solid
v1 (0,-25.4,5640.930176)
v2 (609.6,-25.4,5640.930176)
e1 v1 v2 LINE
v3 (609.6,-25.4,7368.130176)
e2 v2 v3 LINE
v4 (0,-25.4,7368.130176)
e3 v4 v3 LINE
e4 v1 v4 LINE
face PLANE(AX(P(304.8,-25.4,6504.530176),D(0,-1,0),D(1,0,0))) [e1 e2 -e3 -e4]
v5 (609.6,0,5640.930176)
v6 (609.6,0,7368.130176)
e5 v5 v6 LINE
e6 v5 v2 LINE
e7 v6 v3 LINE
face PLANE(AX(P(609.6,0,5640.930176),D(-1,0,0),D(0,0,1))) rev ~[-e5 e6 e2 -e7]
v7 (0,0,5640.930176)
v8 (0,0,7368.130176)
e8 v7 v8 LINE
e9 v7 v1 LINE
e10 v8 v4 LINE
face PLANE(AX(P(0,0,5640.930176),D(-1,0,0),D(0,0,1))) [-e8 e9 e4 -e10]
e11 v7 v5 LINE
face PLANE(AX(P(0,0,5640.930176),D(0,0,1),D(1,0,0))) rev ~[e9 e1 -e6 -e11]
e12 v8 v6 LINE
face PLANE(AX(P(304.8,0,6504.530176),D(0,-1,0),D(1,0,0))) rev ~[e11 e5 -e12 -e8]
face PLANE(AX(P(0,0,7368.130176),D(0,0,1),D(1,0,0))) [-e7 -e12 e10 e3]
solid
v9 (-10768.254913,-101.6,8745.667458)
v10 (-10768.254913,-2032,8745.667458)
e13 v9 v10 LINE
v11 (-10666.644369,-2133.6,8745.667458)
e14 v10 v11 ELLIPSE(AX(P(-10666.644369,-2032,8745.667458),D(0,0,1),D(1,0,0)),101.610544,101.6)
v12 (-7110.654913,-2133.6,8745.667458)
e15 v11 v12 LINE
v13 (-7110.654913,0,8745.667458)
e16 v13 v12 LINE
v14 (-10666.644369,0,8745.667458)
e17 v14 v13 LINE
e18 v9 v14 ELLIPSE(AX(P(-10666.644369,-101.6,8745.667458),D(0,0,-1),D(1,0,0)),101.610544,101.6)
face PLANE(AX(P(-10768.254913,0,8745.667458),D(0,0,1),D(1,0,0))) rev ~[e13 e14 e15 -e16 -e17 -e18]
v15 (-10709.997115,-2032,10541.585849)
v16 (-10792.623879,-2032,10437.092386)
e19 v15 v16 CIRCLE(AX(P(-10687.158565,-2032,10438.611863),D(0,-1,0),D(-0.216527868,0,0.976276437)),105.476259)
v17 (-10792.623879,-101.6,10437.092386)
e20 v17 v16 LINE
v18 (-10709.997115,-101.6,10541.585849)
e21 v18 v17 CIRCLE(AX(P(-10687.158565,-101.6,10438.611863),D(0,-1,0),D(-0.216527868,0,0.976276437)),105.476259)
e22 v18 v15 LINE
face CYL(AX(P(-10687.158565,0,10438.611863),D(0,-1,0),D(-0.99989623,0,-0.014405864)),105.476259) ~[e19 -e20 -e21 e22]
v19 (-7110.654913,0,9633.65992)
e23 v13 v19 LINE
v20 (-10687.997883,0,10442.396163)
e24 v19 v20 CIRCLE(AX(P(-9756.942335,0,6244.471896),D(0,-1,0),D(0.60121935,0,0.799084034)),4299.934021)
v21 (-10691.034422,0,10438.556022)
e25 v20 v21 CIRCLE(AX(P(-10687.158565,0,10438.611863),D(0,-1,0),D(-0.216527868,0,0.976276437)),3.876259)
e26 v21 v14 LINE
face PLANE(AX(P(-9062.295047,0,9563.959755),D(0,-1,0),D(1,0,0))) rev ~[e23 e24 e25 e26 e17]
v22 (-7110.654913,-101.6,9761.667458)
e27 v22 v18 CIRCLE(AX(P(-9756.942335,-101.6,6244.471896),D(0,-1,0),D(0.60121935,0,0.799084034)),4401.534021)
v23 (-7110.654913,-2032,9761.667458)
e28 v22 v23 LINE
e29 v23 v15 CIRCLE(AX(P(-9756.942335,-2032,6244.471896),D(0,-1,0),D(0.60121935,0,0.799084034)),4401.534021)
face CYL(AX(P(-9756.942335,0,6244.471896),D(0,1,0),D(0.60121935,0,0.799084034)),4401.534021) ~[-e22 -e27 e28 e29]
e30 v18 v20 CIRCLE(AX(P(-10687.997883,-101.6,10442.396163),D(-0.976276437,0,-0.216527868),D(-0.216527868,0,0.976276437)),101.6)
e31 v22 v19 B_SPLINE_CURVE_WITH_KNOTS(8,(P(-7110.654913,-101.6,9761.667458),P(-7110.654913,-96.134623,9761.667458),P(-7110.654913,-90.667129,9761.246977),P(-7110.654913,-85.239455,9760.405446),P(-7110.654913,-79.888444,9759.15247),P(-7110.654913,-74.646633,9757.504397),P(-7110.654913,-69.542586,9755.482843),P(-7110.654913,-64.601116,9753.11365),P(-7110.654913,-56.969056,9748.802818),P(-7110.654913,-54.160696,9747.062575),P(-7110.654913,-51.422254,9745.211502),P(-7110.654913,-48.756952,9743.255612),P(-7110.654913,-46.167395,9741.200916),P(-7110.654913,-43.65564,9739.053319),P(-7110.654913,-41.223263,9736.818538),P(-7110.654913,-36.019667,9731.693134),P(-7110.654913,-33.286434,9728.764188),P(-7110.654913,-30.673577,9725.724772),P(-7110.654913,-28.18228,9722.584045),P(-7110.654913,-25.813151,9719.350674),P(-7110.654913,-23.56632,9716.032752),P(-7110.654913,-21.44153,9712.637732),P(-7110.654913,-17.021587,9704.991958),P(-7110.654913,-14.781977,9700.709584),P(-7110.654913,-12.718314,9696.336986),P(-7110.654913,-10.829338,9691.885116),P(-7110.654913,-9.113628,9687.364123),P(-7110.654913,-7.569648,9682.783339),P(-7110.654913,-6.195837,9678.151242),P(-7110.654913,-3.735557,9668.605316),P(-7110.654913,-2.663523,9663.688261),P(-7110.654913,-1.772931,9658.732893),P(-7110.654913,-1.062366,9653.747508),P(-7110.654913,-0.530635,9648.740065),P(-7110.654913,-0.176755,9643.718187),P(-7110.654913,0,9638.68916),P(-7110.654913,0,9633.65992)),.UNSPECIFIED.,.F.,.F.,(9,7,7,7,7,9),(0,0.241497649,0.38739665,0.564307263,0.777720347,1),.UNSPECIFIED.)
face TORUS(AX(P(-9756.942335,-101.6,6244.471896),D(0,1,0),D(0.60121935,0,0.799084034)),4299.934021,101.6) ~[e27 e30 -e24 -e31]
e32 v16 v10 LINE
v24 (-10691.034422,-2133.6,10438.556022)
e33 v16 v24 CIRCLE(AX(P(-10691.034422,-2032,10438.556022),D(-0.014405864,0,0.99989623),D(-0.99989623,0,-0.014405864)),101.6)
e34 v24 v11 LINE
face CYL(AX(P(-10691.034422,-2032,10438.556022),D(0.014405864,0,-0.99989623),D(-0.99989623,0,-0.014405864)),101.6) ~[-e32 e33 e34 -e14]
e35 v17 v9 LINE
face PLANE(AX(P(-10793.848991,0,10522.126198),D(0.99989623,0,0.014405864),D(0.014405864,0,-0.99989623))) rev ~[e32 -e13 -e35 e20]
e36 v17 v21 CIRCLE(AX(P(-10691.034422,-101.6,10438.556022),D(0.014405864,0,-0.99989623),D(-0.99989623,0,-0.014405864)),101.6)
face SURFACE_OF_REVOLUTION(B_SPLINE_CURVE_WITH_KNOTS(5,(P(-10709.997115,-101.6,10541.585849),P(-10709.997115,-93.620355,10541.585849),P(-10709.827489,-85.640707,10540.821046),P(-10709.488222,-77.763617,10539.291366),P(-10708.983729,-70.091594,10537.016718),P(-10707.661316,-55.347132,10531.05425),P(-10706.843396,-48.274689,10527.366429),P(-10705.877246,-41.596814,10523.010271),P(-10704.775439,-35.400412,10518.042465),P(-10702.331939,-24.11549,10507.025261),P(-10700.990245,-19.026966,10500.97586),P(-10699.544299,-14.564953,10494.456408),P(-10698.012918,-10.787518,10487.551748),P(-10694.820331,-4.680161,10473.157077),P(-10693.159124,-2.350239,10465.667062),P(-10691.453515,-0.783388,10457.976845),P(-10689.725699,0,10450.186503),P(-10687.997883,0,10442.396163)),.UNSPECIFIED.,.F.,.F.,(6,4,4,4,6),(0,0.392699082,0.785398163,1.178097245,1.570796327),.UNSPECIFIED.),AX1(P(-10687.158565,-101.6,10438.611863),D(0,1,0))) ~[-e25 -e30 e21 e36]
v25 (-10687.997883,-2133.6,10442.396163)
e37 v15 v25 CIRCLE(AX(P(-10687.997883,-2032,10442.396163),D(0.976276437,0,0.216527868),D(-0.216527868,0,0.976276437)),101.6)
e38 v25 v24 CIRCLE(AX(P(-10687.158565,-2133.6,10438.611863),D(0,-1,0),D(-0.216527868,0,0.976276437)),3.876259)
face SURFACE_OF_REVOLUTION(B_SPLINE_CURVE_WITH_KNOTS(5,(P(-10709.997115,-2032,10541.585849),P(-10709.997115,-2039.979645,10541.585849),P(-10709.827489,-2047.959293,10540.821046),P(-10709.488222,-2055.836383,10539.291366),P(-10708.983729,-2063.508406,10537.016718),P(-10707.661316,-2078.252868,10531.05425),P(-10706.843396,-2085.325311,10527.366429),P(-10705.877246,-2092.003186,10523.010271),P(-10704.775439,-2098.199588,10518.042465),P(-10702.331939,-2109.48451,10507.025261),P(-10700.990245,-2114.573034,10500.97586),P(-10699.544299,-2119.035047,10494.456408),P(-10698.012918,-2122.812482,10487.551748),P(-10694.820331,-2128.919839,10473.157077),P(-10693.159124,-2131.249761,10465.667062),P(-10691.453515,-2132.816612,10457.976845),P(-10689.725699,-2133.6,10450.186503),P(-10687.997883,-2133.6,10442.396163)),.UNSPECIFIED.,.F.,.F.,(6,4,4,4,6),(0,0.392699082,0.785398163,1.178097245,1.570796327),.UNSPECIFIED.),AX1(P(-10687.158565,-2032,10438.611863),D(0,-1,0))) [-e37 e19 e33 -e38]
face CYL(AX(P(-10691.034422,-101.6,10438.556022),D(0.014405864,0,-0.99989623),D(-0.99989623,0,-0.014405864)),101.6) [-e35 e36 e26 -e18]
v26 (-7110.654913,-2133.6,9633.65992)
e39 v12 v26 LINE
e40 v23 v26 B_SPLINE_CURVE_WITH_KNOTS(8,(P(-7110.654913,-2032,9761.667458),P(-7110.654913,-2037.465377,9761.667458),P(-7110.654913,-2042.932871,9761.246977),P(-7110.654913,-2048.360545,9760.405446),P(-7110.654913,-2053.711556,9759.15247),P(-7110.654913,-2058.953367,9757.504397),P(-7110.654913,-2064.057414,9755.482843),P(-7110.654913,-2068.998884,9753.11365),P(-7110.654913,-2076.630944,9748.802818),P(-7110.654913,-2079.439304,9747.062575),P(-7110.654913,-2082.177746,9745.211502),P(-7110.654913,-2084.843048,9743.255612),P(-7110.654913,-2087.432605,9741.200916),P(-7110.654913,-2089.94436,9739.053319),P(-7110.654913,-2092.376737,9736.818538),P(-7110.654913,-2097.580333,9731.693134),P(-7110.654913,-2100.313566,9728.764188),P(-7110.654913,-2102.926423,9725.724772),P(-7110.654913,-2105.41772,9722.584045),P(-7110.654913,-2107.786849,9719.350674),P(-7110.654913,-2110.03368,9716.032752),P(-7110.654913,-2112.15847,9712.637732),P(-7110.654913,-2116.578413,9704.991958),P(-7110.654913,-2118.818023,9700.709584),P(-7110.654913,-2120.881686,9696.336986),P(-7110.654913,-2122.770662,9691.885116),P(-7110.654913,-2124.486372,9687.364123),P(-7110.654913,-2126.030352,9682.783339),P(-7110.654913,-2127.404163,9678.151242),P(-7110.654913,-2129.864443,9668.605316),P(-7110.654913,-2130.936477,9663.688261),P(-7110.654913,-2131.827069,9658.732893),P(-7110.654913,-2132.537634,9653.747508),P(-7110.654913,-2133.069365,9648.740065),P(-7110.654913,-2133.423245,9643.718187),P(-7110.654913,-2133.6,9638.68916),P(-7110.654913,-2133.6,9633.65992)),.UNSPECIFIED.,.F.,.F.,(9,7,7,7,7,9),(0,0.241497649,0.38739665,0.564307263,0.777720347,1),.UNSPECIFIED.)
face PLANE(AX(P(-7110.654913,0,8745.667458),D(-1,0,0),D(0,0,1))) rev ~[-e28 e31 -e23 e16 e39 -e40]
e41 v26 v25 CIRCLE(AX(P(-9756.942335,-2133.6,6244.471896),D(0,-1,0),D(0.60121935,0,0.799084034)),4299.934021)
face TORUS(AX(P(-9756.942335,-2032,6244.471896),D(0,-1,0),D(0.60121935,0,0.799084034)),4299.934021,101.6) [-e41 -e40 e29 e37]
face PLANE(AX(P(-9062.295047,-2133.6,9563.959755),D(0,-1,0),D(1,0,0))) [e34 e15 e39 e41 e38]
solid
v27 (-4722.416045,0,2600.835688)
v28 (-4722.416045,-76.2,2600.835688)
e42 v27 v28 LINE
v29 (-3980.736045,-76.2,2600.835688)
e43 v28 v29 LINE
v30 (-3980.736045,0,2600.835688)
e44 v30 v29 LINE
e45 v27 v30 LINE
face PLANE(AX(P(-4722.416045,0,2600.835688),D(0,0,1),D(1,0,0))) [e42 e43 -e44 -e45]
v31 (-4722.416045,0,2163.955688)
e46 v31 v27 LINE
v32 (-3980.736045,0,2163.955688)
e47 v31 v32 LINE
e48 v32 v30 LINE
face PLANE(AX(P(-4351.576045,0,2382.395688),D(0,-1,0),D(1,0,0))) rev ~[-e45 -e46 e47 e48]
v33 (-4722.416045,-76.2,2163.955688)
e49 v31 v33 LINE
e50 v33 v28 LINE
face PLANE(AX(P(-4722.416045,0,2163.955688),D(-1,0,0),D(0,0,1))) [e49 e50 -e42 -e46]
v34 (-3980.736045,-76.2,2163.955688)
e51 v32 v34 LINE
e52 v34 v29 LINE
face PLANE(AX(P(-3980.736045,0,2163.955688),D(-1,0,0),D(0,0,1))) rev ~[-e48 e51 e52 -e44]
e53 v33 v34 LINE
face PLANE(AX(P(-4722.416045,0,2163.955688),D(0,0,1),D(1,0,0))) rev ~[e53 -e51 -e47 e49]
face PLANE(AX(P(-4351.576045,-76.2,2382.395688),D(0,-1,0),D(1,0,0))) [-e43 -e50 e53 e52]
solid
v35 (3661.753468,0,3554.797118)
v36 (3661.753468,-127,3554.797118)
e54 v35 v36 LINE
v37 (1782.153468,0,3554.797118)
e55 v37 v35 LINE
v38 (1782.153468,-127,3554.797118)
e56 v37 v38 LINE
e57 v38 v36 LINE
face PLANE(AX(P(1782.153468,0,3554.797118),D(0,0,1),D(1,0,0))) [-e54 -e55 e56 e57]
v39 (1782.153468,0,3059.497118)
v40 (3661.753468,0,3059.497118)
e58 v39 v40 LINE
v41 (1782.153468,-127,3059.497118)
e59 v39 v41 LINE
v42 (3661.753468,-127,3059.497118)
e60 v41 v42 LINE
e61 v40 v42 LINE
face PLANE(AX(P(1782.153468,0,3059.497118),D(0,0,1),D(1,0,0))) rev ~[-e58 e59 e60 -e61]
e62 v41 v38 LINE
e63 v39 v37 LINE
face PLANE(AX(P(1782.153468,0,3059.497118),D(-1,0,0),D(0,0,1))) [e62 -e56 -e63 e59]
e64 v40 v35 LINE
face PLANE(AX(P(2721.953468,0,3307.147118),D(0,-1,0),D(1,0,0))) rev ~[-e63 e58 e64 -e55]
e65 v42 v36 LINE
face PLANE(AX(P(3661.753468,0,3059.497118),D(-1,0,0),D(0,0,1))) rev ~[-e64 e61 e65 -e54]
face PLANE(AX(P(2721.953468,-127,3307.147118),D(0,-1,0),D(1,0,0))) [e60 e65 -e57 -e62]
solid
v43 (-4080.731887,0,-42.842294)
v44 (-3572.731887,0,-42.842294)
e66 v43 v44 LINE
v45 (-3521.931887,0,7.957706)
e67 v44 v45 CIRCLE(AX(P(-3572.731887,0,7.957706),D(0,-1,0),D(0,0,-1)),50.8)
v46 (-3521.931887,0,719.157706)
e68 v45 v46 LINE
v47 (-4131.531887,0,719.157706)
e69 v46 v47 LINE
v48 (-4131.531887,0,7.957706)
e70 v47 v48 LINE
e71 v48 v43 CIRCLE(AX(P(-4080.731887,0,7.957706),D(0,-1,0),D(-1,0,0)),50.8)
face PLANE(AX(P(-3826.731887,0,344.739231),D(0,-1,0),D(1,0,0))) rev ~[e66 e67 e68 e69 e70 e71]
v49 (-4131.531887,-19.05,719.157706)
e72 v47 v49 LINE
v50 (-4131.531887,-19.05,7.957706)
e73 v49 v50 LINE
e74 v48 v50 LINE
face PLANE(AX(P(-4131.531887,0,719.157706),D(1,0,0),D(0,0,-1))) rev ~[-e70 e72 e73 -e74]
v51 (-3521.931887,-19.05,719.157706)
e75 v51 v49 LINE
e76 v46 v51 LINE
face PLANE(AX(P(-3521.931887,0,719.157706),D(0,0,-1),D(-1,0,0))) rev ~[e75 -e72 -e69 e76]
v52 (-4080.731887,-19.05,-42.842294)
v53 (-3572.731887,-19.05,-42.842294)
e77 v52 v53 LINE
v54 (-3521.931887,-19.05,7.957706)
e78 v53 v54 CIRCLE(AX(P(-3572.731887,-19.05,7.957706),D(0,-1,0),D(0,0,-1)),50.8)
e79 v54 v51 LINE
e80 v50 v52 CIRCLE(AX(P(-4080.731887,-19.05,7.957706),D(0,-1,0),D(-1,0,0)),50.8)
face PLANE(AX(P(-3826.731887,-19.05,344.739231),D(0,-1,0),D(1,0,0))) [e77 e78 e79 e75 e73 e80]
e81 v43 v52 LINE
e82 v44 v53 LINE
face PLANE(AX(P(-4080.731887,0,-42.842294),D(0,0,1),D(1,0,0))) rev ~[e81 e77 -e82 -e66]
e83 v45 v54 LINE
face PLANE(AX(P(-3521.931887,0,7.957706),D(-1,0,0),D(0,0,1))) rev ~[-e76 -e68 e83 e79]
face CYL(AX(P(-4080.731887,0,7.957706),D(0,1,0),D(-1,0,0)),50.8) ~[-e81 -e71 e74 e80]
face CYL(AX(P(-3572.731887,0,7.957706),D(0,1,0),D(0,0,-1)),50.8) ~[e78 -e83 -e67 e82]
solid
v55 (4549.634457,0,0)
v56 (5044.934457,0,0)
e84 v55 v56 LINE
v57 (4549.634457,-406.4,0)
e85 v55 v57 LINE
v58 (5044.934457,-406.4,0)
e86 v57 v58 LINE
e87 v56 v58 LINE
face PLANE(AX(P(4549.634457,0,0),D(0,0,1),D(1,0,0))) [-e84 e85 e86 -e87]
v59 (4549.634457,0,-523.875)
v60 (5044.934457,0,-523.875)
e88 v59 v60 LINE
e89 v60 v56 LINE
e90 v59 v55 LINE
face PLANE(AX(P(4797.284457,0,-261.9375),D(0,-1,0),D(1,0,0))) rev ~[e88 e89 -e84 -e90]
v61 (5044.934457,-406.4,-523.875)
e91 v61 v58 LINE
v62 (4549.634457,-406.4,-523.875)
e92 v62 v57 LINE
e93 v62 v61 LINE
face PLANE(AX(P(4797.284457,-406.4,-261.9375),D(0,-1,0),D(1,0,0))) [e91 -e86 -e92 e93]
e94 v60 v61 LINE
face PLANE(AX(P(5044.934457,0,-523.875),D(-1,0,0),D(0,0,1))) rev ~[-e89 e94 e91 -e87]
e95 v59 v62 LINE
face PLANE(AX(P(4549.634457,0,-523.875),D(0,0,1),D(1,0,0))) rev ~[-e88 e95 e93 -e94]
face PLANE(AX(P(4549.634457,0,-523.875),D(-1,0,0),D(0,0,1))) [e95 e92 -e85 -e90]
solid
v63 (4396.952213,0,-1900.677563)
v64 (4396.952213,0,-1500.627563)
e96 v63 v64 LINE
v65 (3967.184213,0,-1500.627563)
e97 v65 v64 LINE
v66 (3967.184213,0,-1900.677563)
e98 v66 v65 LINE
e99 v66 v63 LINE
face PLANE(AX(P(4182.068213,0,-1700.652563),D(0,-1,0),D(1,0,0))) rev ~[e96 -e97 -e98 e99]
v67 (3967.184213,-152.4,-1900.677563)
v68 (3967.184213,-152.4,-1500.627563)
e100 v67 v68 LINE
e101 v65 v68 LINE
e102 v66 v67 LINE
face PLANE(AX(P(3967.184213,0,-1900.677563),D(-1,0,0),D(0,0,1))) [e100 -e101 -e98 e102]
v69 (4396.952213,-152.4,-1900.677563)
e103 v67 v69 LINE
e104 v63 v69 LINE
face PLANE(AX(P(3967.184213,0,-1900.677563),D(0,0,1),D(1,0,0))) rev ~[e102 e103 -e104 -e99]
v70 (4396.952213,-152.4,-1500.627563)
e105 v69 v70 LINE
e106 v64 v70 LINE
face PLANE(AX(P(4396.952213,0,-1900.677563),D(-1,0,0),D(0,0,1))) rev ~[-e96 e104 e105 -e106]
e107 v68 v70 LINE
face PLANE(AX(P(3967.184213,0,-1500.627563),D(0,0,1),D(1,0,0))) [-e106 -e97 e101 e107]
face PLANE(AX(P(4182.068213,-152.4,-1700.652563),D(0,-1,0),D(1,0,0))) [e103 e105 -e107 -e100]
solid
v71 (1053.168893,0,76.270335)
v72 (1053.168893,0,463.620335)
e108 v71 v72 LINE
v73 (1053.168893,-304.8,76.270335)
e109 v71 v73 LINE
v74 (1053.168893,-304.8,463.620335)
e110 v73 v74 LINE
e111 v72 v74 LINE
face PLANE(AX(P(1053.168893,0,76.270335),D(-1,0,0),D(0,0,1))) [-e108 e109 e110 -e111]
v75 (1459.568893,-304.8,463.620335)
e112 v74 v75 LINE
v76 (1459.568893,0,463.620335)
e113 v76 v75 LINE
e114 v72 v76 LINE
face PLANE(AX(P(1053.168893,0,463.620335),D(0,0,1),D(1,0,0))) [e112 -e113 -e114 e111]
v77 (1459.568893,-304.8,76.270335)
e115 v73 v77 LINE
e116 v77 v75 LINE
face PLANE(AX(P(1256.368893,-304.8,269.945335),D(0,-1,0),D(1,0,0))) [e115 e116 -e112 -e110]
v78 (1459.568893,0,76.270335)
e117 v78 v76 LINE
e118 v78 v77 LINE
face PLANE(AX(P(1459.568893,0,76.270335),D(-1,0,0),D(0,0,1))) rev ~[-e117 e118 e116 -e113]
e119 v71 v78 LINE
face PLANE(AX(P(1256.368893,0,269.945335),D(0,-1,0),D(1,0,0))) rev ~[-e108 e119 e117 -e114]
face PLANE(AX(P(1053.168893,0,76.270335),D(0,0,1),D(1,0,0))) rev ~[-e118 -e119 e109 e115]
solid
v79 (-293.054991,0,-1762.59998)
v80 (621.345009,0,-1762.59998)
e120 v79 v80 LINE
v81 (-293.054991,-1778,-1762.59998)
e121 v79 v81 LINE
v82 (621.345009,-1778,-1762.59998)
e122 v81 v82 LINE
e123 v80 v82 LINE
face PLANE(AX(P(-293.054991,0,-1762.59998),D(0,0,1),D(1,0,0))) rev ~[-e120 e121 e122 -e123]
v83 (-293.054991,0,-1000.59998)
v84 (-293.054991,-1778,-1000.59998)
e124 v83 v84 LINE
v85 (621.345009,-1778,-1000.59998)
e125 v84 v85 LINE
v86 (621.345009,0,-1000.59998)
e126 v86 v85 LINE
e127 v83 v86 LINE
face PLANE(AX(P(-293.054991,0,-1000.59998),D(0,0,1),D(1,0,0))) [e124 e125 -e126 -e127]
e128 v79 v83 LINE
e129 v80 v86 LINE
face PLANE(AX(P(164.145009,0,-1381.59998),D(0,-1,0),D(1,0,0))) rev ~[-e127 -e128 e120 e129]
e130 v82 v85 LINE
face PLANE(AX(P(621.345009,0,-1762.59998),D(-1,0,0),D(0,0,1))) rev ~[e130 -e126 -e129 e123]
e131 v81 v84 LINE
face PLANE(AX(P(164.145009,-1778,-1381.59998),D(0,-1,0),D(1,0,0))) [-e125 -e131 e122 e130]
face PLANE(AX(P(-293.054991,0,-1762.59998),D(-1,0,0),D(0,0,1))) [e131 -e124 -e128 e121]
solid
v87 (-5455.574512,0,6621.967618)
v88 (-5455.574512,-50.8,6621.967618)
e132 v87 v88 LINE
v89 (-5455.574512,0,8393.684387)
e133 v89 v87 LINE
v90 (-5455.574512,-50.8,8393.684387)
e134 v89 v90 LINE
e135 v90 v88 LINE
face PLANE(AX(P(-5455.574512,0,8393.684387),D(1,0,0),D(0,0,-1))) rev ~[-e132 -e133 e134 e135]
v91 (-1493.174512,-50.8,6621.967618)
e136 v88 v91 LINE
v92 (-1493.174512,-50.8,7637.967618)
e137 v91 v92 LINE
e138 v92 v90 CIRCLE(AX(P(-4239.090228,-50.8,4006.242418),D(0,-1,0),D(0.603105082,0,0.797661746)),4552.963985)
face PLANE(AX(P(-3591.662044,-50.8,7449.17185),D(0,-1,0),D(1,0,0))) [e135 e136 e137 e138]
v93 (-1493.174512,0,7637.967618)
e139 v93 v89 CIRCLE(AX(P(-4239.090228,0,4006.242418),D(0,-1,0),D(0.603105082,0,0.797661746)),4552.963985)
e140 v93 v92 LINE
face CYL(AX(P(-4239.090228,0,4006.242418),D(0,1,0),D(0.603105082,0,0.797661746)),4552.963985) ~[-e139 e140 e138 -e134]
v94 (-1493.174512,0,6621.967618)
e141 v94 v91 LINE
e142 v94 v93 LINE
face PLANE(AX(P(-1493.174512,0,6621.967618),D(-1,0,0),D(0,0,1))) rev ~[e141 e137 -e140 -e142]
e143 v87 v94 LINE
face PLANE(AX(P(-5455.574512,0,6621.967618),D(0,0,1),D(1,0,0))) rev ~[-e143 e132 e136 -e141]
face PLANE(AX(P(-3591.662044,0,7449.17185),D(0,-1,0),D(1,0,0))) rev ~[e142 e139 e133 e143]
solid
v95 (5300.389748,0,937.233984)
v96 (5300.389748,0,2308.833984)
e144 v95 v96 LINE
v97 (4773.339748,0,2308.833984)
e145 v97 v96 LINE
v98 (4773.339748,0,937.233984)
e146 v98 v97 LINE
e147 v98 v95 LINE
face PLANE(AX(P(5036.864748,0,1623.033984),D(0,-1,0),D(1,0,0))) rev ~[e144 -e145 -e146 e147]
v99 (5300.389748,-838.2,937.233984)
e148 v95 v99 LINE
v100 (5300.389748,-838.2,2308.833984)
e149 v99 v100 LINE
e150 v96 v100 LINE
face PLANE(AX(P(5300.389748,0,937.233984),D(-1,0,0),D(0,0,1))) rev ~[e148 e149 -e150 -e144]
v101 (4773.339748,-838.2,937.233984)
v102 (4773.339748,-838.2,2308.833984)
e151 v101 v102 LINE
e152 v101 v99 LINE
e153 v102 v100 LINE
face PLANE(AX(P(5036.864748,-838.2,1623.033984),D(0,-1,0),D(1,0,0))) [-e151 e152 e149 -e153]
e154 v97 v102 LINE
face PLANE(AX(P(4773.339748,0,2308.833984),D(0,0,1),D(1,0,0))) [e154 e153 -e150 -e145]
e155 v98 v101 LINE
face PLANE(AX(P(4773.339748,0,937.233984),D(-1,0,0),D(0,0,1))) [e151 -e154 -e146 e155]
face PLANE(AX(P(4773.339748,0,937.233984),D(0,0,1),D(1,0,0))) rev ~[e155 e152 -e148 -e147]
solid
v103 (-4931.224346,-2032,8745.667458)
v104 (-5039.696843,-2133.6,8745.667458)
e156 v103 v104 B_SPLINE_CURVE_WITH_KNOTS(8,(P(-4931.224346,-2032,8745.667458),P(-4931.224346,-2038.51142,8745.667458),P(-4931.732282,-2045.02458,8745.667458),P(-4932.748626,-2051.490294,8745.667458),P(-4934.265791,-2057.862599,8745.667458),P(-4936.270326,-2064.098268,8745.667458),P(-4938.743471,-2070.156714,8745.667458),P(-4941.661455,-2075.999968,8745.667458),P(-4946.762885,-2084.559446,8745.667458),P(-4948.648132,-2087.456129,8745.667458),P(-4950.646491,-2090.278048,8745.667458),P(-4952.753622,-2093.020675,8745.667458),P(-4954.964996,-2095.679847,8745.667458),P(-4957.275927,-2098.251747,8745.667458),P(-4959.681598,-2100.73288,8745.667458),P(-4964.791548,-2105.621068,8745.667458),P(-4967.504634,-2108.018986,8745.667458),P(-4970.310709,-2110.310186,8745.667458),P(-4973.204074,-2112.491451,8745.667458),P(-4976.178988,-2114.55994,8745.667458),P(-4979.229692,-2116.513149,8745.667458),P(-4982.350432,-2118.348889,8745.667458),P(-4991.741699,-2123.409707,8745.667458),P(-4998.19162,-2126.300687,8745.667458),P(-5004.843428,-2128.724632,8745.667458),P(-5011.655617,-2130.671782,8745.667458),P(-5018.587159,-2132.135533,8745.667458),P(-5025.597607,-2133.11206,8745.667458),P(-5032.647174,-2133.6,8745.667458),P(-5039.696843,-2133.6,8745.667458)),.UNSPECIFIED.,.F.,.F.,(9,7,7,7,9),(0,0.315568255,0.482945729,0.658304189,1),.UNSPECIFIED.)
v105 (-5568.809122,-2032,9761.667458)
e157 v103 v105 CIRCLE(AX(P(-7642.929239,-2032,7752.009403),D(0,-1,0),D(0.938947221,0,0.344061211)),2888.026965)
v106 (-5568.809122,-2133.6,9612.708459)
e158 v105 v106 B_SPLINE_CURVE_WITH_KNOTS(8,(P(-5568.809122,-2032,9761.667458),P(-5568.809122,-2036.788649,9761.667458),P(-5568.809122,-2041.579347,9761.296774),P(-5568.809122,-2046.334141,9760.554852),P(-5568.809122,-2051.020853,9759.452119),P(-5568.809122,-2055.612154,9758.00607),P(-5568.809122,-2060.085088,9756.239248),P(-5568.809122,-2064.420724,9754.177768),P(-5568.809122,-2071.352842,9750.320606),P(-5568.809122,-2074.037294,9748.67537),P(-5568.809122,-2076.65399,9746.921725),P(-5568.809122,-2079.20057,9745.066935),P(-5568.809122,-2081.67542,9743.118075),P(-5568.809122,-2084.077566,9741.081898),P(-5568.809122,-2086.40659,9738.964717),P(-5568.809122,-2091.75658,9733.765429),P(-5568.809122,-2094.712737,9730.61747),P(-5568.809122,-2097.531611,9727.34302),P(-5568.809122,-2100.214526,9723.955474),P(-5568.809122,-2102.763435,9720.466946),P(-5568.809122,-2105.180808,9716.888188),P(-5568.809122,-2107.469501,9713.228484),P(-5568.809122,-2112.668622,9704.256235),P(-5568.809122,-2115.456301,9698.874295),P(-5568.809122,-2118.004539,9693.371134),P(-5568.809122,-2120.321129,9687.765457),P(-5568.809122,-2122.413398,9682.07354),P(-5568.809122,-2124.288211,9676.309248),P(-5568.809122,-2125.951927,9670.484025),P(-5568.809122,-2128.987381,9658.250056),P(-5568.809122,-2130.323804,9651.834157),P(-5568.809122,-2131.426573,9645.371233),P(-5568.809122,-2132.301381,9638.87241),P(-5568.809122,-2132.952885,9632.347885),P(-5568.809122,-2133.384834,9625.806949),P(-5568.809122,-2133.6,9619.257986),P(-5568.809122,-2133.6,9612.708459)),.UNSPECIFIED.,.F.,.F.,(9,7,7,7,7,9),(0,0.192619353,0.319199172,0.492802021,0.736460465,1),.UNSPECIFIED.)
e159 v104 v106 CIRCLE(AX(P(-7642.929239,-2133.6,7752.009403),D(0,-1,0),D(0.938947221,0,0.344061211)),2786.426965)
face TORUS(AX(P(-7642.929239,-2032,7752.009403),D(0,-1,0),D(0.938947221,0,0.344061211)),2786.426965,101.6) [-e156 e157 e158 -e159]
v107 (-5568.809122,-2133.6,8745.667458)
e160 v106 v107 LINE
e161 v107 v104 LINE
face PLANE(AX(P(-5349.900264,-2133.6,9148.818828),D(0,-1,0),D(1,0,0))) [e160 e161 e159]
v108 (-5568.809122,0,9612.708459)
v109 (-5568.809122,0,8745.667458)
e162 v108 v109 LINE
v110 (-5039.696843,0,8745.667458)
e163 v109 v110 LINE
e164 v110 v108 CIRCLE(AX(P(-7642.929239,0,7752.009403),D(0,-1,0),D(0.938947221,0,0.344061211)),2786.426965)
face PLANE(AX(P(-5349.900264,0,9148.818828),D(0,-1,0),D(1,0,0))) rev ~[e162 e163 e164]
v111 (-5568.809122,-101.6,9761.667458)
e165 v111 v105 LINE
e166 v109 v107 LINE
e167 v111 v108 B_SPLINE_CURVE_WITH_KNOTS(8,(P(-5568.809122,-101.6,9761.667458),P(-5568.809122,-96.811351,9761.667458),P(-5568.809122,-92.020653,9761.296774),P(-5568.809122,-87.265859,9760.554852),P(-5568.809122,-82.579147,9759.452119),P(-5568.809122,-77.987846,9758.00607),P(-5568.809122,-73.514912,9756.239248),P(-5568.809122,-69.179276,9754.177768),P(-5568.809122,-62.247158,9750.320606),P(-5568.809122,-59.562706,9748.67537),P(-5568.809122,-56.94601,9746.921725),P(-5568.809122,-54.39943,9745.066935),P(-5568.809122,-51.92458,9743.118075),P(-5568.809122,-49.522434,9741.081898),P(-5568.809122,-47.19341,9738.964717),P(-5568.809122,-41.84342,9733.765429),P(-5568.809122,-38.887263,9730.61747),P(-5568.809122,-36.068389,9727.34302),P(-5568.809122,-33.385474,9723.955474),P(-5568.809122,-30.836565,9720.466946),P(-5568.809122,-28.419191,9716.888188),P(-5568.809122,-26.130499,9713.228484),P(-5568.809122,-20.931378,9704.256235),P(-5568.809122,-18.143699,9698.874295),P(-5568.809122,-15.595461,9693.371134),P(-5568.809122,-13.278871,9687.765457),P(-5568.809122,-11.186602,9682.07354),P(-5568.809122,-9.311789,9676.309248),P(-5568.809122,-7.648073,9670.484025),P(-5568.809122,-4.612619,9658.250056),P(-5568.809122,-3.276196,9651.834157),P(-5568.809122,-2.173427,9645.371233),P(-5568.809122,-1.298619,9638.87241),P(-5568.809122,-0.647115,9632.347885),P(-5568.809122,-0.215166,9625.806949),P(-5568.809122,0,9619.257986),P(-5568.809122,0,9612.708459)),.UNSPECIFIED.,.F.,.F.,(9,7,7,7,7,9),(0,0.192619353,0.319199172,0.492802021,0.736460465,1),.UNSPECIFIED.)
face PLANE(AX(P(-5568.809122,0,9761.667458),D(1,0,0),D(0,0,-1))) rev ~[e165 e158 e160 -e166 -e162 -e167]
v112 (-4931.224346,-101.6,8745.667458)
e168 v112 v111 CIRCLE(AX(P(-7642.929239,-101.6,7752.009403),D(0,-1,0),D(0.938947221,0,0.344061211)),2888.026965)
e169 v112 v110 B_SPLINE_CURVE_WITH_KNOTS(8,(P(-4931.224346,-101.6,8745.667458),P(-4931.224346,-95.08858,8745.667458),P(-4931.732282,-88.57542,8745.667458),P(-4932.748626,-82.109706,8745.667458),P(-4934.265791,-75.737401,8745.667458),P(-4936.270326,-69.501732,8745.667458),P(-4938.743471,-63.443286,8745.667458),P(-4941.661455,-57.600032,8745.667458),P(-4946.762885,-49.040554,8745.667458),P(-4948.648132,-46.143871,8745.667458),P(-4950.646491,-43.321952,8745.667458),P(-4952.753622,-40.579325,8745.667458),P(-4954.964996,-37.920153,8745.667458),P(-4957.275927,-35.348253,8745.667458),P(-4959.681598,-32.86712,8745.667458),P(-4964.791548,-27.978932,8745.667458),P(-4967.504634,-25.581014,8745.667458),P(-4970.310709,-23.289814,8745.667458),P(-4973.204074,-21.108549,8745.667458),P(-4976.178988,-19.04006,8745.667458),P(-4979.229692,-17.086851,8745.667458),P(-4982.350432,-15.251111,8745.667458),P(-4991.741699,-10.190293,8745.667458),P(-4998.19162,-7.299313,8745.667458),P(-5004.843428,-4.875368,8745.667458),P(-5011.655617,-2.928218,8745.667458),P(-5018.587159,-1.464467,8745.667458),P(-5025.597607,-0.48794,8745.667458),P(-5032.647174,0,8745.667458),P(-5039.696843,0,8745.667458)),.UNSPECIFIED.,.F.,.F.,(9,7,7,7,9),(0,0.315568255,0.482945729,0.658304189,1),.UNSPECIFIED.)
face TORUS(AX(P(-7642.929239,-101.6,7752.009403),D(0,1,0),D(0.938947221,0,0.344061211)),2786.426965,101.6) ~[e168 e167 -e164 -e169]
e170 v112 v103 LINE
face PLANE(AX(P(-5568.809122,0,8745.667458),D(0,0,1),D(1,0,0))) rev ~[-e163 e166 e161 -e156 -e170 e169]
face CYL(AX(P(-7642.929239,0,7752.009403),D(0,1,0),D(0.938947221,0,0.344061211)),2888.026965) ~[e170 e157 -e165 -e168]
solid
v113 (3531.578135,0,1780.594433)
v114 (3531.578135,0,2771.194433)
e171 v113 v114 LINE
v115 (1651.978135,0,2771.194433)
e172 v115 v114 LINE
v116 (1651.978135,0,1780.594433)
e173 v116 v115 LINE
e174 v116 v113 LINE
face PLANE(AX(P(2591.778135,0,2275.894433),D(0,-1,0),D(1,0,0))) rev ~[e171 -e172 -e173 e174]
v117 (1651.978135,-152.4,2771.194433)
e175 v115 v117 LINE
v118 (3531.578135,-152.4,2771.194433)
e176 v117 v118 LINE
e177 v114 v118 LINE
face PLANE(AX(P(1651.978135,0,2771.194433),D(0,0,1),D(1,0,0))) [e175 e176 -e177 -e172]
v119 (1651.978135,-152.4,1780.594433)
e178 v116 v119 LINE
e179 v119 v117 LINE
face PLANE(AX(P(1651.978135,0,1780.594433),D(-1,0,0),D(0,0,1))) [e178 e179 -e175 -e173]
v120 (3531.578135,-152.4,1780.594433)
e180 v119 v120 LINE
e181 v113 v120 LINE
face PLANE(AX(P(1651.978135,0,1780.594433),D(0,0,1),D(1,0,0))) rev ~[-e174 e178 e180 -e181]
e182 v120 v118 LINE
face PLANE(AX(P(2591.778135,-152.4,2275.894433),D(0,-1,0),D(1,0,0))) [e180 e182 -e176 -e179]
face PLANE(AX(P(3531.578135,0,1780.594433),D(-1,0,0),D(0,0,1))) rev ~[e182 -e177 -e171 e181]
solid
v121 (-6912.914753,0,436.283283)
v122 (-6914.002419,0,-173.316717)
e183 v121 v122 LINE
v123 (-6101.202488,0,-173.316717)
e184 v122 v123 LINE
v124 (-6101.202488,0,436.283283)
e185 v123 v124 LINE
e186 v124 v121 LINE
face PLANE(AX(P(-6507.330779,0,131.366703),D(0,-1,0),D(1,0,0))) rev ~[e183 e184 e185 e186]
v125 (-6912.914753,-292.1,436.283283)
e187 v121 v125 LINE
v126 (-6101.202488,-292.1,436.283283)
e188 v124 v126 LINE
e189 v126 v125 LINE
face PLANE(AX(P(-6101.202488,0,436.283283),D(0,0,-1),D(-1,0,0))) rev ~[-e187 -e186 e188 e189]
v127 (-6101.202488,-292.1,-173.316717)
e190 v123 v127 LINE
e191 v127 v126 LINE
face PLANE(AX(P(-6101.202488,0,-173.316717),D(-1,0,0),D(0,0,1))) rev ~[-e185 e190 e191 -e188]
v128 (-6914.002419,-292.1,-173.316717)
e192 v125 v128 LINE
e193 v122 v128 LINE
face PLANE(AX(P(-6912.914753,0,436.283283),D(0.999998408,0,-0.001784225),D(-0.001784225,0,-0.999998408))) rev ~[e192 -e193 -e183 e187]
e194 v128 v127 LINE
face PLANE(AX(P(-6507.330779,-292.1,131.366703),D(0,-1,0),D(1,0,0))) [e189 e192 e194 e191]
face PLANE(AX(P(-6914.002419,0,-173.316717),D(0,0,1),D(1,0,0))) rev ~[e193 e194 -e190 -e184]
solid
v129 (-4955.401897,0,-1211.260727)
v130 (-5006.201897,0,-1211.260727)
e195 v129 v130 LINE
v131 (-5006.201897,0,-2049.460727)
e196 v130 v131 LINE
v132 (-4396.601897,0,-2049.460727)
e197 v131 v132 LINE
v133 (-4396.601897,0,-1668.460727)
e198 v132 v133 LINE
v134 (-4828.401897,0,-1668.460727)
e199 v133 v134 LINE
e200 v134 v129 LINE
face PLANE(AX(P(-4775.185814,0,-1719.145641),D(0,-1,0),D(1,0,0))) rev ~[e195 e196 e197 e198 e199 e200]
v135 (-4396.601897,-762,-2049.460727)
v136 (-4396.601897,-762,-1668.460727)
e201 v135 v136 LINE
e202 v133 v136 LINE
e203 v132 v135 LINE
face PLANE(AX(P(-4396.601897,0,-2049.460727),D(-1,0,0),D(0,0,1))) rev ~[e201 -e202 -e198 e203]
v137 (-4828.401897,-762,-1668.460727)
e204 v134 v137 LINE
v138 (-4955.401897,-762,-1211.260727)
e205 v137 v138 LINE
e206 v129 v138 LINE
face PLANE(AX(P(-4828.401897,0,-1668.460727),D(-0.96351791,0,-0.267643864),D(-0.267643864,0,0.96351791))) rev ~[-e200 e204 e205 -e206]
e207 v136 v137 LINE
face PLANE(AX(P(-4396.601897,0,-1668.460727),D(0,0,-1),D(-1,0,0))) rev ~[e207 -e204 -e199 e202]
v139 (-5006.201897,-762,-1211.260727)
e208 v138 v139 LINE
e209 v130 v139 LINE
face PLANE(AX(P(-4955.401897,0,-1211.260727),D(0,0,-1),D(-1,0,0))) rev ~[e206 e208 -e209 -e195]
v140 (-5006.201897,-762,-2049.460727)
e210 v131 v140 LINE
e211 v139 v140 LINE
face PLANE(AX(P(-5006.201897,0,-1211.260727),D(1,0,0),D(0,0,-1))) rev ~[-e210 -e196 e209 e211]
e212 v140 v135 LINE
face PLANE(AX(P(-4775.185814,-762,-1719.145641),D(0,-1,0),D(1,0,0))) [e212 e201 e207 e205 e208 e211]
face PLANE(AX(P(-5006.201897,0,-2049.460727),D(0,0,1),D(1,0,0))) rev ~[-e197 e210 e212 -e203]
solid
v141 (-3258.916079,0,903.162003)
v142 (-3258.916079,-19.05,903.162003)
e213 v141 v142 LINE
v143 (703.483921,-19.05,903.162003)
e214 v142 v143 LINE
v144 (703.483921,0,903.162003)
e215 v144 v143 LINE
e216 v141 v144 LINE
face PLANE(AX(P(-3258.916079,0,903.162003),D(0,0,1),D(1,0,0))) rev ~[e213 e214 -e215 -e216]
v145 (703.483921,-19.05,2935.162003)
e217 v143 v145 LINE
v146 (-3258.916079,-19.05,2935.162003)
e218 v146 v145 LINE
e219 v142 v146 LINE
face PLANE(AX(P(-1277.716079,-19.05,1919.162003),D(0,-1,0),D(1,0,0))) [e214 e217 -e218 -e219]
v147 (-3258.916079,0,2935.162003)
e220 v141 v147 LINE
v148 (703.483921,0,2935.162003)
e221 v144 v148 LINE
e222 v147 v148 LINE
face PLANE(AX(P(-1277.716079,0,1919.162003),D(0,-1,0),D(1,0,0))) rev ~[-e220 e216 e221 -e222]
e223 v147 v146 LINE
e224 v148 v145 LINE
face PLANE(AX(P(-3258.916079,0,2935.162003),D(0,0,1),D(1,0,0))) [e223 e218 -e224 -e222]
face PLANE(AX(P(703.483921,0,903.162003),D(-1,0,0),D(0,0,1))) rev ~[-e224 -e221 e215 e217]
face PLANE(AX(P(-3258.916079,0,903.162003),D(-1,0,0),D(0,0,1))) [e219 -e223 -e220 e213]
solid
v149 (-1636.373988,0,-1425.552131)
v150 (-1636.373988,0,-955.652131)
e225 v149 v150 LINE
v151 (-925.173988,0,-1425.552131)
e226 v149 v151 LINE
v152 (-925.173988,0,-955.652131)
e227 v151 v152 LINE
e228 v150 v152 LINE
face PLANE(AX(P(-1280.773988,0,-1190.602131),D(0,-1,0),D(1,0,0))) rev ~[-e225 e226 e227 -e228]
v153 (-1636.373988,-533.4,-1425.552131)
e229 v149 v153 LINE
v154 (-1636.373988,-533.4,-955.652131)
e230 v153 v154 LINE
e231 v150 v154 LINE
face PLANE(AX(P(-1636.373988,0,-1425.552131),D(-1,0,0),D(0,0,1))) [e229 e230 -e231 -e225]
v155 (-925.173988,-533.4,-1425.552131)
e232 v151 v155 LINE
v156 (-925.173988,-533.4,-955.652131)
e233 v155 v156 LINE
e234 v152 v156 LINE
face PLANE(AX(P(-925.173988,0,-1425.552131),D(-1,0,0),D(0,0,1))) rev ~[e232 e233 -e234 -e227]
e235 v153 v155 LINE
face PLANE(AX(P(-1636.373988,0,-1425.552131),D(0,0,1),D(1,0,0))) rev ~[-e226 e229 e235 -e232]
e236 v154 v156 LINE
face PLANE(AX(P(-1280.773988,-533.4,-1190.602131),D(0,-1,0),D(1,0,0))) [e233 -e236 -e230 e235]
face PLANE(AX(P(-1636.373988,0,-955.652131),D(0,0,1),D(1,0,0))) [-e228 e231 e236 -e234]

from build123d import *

# Parameters (mm, degrees)
F0_W      = 3962.4
F0_H      = 2032
F1_DEPTH  = 19.05
F0_W_2    = 527.05
F0_H_2    = 1371.6
F2_DEPTH  = 838.2
F0_W_3    = 495.3
F0_H_3    = 523.875
F3_DEPTH  = 406.4
F0_W_4    = 429.768
F0_H_4    = 400.05
F4_DEPTH  = 152.4
F0_W_5    = 741.68
F0_H_5    = 436.88
F5_DEPTH  = 76.2
F6_DEPTH  = 50.8
F7_DEPTH  = 19.05
F8_DEPTH  = 762
F9_DEPTH  = 2133.6
F0_W_6    = 609.6
F0_H_6    = 1727.2
F10_DEPTH = 25.4
F0_W_7    = 406.4
F0_H_7    = 387.35
F11_DEPTH = 304.8
F0_W_8    = 914.4
F0_H_8    = 762
F12_DEPTH = 1778
F0_W_9    = 711.2
F0_H_9    = 469.9
F13_DEPTH = 533.4
F14_DEPTH = 2133.6
F15_R     = 105.4762589975
F16_R     = 101.6
F16_2_R   = 101.6
F0_W_10   = 1879.6
F0_H_10   = 990.6
F17_DEPTH = 152.4
F18_DEPTH = 292.1
F0_H_11   = 495.3
F19_DEPTH = 127


# Not quite as in the source:
# - ends of sketch curves that miss each other by under 0.0002 mm in the source are joined


with BuildPart() as f1:
    # F0 (on Front) → F1 (new body)
    with BuildSketch(Plane.XZ):
        with Locations((-1277.7160794973, 1919.1620025635)):
            Rectangle(F0_W, F0_H)
    extrude(amount=F1_DEPTH)


with BuildPart() as f2:
    # F0 (on Front) → F2 (new body)
    with BuildSketch(Plane.XZ):
        with Locations((5036.8647483826, 1623.0339844704)):
            Rectangle(F0_W_2, F0_H_2)
    extrude(amount=F2_DEPTH)


with BuildPart() as f3:
    # F0 (on Front) → F3 (new body)
    with BuildSketch(Plane.XZ):
        with Locations((4797.2844566345, -261.9375)):
            Rectangle(F0_W_3, F0_H_3)
    extrude(amount=F3_DEPTH)


with BuildPart() as f4:
    # F0 (on Front) → F4 (new body)
    with BuildSketch(Plane.XZ):
        with Locations((4182.0682132568, -1700.6525627136)):
            Rectangle(F0_W_4, F0_H_4)
    extrude(amount=F4_DEPTH)


with BuildPart() as f5:
    # F0 (on Front) → F5 (new body)
    with BuildSketch(Plane.XZ):
        with Locations((-4351.5760449982, 2382.3956884766)):
            Rectangle(F0_W_5, F0_H_5)
    extrude(amount=F5_DEPTH)


with BuildPart() as f6:
    # F0 (on Front) → F6 (new body)
    with BuildSketch(Plane.XZ):
        with BuildLine():
            Line((-5455.5745124817, 8393.684387207), (-5455.5745124817, 6621.967618318))
            Line((-5455.5745124817, 6621.967618318), (-1493.1745124817, 6621.967618318))
            Line((-1493.1745124817, 6621.967618318), (-1493.1745124817, 7637.967618318))
            ThreePointArc((-1493.1745124817, 7637.967618318), (-3386.1147979663, 8478.5923554399), (-5455.5745124817, 8393.684387207))
        make_face()
    extrude(amount=F6_DEPTH)


with BuildPart() as f7:
    # F0 (on Front) → F7 (new body)
    with BuildSketch(Plane.XZ):
        with BuildLine():
            Line((-3521.931886673, 719.1577055931), (-4131.531886673, 719.1577055931))
            Line((-4131.531886673, 719.1577055931), (-4131.531886673, 7.9577055931))
            ThreePointArc((-4131.531886673, 7.9577055931), (-4116.6529111573, -27.9633188912), (-4080.731886673, -42.8422944069))
            Line((-4080.731886673, -42.8422944069), (-3572.731886673, -42.8422944069))
            ThreePointArc((-3572.731886673, -42.8422944069), (-3536.8108621887, -27.9633188912), (-3521.931886673, 7.9577055931))
            Line((-3521.931886673, 7.9577055931), (-3521.931886673, 719.1577055931))
        make_face()
    extrude(amount=F7_DEPTH)


with BuildPart() as f8:
    # F0 (on Front) → F8 (new body)
    with BuildSketch(Plane.XZ):
        Polygon((-4828.4018974304, -1668.460726738), (-4955.4018974304, -1211.260726738), (-5006.2018974304, -1211.260726738), (-5006.2018974304, -2049.460726738), (-4955.4018974304, -2049.460726738), (-4396.6018974304, -2049.460726738), (-4396.6018974304, -1668.460726738), align=None)
    extrude(amount=F8_DEPTH)


with BuildPart() as f9:
    # F0 (on Front) → F9 (new body)
    with BuildSketch(Plane.XZ):
        with BuildLine():
            Line((-10793.848991394, 10522.1261978149), (-10768.254913326, 8745.6674575806))
            Line((-10768.254913326, 8745.6674575806), (-7110.654913326, 8745.6674575806))
            Line((-7110.654913326, 8745.6674575806), (-7110.654913326, 9761.6674575806))
            ThreePointArc((-7110.654913326, 9761.6674575806), (-8866.9417812081, 10555.0867886532), (-10793.848991394, 10522.1261978149))
        make_face()
    extrude(amount=F9_DEPTH)

    # F15
    f15_edges = [f9.edges().sort_by_distance(p)[0] for p in [
        (-10793.848991, -1066.8, 10522.126198),
    ]]
    fillet(f15_edges, radius=F15_R)

    # F16
    f16_edges = [f9.edges().sort_by_distance(p)[0] for p in [
        (-10780.439396, -2133.6, 9591.379922),
        (-10780.439396, 0, 9591.379922),
    ]]
    fillet(f16_edges, radius=F16_R)


with BuildPart() as f10:
    # F0 (on Front) → F10 (new body)
    with BuildSketch(Plane.XZ):
        with Locations((304.8, 6504.5301757813)):
            Rectangle(F0_W_6, F0_H_6)
    extrude(amount=F10_DEPTH)


with BuildPart() as f11:
    # F0 (on Front) → F11 (new body)
    with BuildSketch(Plane.XZ):
        with Locations((1256.3688928604, 269.9453348637)):
            Rectangle(F0_W_7, F0_H_7)
    extrude(amount=F11_DEPTH)


with BuildPart() as f12:
    # F0 (on Front) → F12 (new body)
    with BuildSketch(Plane.XZ):
        with Locations((164.1450090408, -1381.5999803543)):
            Rectangle(F0_W_8, F0_H_8)
    extrude(amount=F12_DEPTH)


with BuildPart() as f13:
    # F0 (on Front) → F13 (new body)
    with BuildSketch(Plane.XZ):
        with Locations((-1280.7739883423, -1190.6021306038)):
            Rectangle(F0_W_9, F0_H_9)
    extrude(amount=F13_DEPTH)


with BuildPart() as f14:
    # F0 (on Front) → F14 (new body)
    with BuildSketch(Plane.XZ):
        with BuildLine():
            Line((-5568.809122225, 9761.6674575806), (-5568.809122225, 8745.6674575806))
            Line((-5568.809122225, 8745.6674575806), (-4931.2243461609, 8745.6674575806))
            ThreePointArc((-4931.2243461609, 8745.6674575806), (-5196.6883972792, 9287.1333392233), (-5568.809122225, 9761.6674575806))
        make_face()
    extrude(amount=F14_DEPTH)

    # F16#2
    f16_2_edges = [f14.edges().sort_by_distance(p)[0] for p in [
        (-5196.688397, -2133.6, 9287.133339),
        (-5196.688397, 0, 9287.133339),
    ]]
    fillet(f16_2_edges, radius=F16_2_R)


with BuildPart() as f17:
    # F0 (on Front) → F17 (new body)
    with BuildSketch(Plane.XZ):
        with Locations((2591.7781351089, 2275.894433403)):
            Rectangle(F0_W_10, F0_H_10)
    extrude(amount=F17_DEPTH)


with BuildPart() as f18:
    # F0 (on Front) → F18 (new body)
    with BuildSketch(Plane.XZ):
        Polygon((-6101.2024879456, -173.3167171478), (-6101.2024879456, 436.2832828522), (-6912.9147529602, 436.2832828522), (-6914.0024185181, -173.3167171478), align=None)
    extrude(amount=F18_DEPTH)


with BuildPart() as f19:
    # F0 (on Front) → F19 (new body)
    with BuildSketch(Plane.XZ):
        with Locations((2721.9534678528, 3307.1471179962)):
            Rectangle(F0_W_10, F0_H_11)
    extrude(amount=F19_DEPTH)


solid = Compound([f1.part, f2.part, f3.part, f4.part, f5.part, f6.part, f7.part, f8.part, f9.part, f10.part, f11.part, f12.part, f13.part, f14.part, f17.part, f18.part, f19.part])
